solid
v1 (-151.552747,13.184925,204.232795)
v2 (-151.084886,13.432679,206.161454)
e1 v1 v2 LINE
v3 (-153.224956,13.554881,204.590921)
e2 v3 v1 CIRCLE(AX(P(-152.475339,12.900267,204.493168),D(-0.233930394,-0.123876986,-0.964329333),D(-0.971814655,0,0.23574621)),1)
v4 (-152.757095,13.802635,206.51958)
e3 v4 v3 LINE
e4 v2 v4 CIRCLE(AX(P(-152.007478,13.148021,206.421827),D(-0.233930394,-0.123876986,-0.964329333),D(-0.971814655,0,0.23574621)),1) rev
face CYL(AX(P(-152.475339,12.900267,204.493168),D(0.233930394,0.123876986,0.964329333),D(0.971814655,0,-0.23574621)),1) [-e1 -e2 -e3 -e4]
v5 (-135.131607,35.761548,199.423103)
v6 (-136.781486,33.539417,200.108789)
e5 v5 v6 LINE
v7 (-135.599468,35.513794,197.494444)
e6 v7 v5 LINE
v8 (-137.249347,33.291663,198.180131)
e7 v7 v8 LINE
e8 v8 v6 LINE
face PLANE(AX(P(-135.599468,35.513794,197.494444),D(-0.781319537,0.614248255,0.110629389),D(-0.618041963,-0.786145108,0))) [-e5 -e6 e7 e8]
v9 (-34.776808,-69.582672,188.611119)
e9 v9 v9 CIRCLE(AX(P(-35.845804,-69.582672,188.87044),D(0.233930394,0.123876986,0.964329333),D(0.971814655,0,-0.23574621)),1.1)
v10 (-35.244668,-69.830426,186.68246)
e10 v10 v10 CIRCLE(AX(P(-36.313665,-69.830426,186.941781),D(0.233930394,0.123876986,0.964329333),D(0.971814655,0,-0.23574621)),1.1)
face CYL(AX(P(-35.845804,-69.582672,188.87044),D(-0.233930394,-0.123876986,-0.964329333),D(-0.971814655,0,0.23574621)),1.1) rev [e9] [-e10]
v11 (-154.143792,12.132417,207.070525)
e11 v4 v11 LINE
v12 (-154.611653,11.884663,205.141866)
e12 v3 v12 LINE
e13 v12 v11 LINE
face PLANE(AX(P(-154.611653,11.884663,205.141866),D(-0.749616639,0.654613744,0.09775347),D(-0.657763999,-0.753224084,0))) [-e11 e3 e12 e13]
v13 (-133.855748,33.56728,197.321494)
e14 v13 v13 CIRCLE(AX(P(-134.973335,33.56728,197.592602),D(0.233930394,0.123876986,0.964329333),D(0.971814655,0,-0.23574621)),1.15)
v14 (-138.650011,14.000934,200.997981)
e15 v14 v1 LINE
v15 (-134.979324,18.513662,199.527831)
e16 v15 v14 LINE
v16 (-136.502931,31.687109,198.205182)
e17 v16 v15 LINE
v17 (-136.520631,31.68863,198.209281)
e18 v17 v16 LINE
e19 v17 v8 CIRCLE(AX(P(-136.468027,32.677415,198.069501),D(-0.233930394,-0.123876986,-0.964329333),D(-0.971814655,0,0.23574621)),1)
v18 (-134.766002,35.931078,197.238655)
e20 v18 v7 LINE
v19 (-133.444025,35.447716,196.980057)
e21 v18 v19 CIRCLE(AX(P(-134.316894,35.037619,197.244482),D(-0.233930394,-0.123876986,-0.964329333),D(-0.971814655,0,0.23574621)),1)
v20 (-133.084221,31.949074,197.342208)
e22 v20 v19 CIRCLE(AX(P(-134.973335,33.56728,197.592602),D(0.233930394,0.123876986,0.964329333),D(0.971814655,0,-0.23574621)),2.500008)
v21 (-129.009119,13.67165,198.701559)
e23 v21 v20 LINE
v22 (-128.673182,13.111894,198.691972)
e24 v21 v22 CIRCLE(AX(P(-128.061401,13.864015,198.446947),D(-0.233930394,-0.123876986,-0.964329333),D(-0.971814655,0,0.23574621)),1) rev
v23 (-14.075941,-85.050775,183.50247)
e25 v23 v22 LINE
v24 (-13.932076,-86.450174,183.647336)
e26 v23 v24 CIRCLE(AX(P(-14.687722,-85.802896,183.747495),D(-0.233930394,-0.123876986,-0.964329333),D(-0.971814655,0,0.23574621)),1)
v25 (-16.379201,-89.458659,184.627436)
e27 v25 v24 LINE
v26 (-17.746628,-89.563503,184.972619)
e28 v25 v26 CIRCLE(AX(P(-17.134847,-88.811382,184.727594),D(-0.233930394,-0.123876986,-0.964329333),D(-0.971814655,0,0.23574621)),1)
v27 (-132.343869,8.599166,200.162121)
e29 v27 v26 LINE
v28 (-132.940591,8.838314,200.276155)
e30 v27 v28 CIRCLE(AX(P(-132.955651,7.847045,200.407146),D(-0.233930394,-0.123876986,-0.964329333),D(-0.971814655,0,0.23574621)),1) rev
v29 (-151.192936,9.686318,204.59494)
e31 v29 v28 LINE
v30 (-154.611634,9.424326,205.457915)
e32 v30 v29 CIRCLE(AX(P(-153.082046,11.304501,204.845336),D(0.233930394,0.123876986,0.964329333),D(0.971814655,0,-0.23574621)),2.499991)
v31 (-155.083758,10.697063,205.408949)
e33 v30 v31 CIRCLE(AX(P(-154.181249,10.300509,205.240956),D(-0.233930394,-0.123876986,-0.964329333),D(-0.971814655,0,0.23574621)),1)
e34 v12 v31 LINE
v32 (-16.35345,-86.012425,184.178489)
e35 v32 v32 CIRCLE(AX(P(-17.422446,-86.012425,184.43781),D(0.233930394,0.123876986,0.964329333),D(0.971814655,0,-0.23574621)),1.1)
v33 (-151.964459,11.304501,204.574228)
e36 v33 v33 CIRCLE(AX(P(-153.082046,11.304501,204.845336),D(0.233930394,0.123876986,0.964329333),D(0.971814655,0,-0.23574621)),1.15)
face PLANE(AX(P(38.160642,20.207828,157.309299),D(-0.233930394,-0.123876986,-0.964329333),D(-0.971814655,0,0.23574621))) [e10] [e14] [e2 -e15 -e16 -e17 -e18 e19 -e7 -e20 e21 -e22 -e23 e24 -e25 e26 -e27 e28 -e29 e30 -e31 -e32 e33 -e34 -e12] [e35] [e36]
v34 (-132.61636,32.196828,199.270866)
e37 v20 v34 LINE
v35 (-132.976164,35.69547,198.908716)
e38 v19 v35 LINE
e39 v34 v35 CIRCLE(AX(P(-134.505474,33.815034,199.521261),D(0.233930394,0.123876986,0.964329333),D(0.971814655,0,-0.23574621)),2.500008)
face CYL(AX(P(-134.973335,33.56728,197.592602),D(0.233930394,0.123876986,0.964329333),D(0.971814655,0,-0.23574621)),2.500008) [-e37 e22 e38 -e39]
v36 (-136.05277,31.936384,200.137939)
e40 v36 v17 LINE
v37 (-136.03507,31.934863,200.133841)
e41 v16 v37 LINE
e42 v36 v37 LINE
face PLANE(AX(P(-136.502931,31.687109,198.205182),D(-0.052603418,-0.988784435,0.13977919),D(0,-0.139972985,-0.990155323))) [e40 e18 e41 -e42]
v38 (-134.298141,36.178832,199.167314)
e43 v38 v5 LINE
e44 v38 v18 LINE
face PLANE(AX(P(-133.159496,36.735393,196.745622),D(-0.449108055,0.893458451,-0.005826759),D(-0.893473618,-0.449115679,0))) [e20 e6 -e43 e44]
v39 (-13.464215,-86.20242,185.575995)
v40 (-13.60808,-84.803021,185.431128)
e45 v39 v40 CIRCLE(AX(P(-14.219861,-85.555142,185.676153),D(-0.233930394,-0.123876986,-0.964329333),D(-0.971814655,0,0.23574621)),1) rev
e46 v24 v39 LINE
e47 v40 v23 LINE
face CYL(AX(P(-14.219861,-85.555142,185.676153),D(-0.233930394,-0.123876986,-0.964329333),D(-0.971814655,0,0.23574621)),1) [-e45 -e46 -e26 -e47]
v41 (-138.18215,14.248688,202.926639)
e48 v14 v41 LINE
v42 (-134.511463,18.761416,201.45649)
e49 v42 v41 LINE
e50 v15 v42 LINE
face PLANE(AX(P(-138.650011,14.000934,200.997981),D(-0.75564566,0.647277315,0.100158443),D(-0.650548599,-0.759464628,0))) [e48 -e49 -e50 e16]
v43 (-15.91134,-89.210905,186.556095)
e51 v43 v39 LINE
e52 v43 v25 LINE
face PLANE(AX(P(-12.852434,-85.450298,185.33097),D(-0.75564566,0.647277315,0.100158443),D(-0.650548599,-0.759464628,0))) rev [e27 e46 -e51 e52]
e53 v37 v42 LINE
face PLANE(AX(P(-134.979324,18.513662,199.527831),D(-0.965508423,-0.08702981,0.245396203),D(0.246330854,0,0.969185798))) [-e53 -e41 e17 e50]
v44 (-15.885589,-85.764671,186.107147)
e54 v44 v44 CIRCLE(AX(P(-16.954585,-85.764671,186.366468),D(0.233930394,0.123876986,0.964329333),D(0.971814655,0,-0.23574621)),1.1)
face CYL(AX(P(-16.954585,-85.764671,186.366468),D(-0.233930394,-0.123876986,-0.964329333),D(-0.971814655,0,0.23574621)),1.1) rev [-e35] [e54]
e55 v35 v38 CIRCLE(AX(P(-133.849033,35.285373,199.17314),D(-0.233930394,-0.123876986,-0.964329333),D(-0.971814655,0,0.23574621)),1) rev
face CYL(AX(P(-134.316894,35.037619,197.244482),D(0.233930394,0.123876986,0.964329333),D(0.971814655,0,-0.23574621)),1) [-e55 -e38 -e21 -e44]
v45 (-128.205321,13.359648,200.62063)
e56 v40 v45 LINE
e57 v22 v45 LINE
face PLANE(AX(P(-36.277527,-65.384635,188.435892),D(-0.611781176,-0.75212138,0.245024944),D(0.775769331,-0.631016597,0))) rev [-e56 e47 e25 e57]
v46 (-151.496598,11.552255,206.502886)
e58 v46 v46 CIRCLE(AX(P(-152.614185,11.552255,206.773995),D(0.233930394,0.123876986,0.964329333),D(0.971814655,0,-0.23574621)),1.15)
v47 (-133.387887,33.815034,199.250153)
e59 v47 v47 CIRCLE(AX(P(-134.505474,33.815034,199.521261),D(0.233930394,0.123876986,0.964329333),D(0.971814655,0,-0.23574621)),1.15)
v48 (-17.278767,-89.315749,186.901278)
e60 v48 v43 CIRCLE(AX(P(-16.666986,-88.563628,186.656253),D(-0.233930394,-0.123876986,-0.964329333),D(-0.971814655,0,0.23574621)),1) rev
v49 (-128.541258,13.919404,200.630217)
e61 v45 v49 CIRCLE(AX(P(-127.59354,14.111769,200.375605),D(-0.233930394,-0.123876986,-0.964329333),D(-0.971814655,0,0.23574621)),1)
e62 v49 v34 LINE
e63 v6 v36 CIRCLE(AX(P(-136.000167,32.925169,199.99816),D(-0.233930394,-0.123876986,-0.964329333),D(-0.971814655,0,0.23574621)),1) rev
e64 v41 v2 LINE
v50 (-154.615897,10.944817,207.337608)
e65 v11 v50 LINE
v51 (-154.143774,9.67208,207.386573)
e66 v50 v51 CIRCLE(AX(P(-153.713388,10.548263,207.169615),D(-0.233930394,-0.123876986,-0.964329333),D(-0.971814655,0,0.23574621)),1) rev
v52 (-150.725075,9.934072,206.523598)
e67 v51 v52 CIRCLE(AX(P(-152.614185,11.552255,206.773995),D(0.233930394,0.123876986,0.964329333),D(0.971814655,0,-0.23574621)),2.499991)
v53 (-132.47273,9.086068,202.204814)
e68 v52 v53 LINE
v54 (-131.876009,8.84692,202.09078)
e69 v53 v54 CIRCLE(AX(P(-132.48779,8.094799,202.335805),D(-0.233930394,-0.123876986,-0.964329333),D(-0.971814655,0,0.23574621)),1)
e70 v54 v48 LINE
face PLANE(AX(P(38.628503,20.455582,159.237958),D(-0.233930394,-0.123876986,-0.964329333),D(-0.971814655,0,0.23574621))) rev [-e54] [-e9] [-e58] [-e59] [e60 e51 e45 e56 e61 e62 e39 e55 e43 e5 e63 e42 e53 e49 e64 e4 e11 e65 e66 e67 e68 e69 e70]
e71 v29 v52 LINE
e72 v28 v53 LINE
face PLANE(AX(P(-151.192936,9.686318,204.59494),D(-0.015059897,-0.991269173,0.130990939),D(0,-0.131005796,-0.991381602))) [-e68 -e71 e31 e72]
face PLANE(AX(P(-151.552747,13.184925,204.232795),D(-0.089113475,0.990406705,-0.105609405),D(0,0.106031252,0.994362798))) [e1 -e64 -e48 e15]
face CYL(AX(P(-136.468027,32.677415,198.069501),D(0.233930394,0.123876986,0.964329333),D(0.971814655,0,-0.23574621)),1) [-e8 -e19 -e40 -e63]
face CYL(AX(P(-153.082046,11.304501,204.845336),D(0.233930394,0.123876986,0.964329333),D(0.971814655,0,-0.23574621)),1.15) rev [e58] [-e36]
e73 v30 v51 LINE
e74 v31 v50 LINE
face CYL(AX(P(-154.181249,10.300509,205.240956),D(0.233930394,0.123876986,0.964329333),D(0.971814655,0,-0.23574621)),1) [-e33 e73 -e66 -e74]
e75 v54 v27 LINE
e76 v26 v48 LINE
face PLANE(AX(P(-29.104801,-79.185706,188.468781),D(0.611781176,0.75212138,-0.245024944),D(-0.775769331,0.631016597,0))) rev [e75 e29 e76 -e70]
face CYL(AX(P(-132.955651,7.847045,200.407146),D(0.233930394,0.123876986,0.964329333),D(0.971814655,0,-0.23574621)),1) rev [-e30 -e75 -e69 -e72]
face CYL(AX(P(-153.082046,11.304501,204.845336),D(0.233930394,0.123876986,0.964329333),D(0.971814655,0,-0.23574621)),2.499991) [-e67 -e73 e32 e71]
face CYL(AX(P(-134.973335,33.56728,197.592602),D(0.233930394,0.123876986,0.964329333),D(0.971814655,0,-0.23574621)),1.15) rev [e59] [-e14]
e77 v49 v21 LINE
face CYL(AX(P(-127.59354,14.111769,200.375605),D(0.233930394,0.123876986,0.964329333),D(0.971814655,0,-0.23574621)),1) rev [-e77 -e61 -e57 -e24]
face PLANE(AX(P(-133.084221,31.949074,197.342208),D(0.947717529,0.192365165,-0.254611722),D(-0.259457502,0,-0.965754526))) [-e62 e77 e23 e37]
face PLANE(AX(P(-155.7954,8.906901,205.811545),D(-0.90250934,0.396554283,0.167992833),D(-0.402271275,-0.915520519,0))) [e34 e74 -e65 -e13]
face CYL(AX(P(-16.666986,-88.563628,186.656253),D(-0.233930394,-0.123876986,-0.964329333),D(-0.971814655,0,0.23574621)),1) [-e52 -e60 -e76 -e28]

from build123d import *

# Parameters (mm, degrees)
SZKIC3_R                    = 1.10000034
DODANIE_WYCI_GNI_CIE2_DEPTH = 2
SZKIC7_R                    = 1.15000024
DODANIE_WYCI_GNI_CIE4_DEPTH = 2
ZAOKR_GLENIE1_R             = 1


with BuildPart() as part:
    # Szkic3 → Dodanie-wyciągnięcie2 (new body)
    with BuildSketch(Plane(origin=(38.160641903, 20.207828477, 157.30929901), x_dir=(0.972253346903095, -0.029805597670841302, -0.23202382589556209), z_dir=(0.23393039442477367, 0.12387698555880203, 0.964329333274237))):
        Polygon((-69.666310572, -102.553561212), (-79.264860968, -94.782442078), (-80.819178513, -93.5240451), (-77.043735552, -88.860781173), (-75.489418007, -90.119178151), (-65.890867611, -97.890297285), (-52.950125678, -108.367300905), (-56.725568639, -113.030564831), align=None)
        with Locations(Location((-57.169345947, -108.811046896, 0), (0, 0, 1.721249632))):
            Circle(SZKIC3_R, mode=Mode.SUBTRACT)
        with Locations(Location((-76.599691895, -93.079970126, 0), (0, 0, 1.721249632))):
            Circle(SZKIC3_R, mode=Mode.SUBTRACT)
    extrude(amount=DODANIE_WYCI_GNI_CIE2_DEPTH)

    # Szkic7 → Dodanie-wyciągnięcie4 (add)
    with BuildSketch(Plane(origin=(38.628502692, 20.455582448, 159.237957676), x_dir=(0.9722533469030947, -0.029805597670841396, -0.23202382589556286), z_dir=(0.23393039442477445, 0.12387698555880199, 0.9643293332742368))):
        with BuildLine():
            Line((-80.819178513, -93.5240451), (-175.638878356, -16.756704897))
            Line((-175.638878356, -16.756704897), (-194.757445315, -16.460528815))
            ThreePointArc((-194.757445315, -16.460528815), (-196.438982344, -17.373715152), (-198.273708049, -16.830338985))
            Line((-198.273708049, -16.830338985), (-199.491256389, -17.388602921))
            Line((-199.491256389, -17.388602921), (-198.273726955, -14.349785721))
            Line((-198.273726955, -14.349785721), (-195.616721108, -11.132918291))
            Line((-195.616721108, -11.132918291), (-195.127524487, -12.944294382))
            Line((-195.127524487, -12.944294382), (-181.856563591, -11.72278095))
            Line((-181.856563591, -11.72278095), (-178.08112063, -7.059517023))
            Line((-178.08112063, -7.059517023), (-179.648209308, 6.175086532))
            Line((-179.648209308, 6.175086532), (-181.521733094, 6.276601555))
            Line((-181.521733094, 6.276601555), (-178.718962553, 10.061139804))
            Line((-178.718962553, 10.061139804), (-176.20935813, 11.368191294))
            Line((-176.20935813, 11.368191294), (-176.502006841, 10.061139804))
            ThreePointArc((-176.502006841, 10.061139804), (-175.588684843, 8.379653584), (-176.131934764, 6.544869536))
            Line((-176.131934764, 6.544869536), (-171.863435395, -12.093440971))
            Line((-171.863435395, -12.093440971), (-77.043735552, -88.860781173))
            Line((-77.043735552, -88.860781173), (-80.819178513, -93.5240451))
        make_face()
        with Locations(Location((-178.074960694, 8.117983918, 0), (0, 0, 1.721249632))):
            Circle(SZKIC7_R, mode=Mode.SUBTRACT)
        with Locations(Location((-196.700467622, -14.887437029, 0), (0, 0, 1.721249632))):
            Circle(SZKIC7_R, mode=Mode.SUBTRACT)
    extrude(amount=-DODANIE_WYCI_GNI_CIE4_DEPTH)

    # Zaokrąglenie1
    # the kernel refuses this fillet: 1 mm, written as the material it adds along each edge
    with BuildSketch(Plane(origin=(-132.136984635, 9.070469004, 202.125371666), x_dir=(0.7556456600365923, -0.6472773151749931, -0.10015844311747091), z_dir=(-0.23393039442477445, -0.12387698555880199, -0.9643293332742368))) as zaokr_glenie1_piece_1:
        with BuildLine():
            CenterArc((ZAOKR_GLENIE1_R * 0.345368312497, ZAOKR_GLENIE1_R), ZAOKR_GLENIE1_R, 231.893419256, 38.106580745)
            Line((-ZAOKR_GLENIE1_R * 0.271757942514, ZAOKR_GLENIE1_R * 0.213135853291), (0, 0))
            Line((0, 0), (ZAOKR_GLENIE1_R * 0.345368312498, 0))
        make_face()
    extrude(amount=2)
    with BuildSketch(Plane(origin=(-128.466297581, 13.583197282, 200.655222001), x_dir=(0.755645659983129, -0.6472773152407205, -0.10015844309605833), z_dir=(-0.23393039442477445, -0.12387698555880199, -0.9643293332742368))) as zaokr_glenie1_piece_2:
        with BuildLine():
            CenterArc((ZAOKR_GLENIE1_R * 0.345368517806, -ZAOKR_GLENIE1_R), ZAOKR_GLENIE1_R, 89.999999995, 38.106601769)
            Line((-ZAOKR_GLENIE1_R * 0.271758025873, -ZAOKR_GLENIE1_R * 0.213136079689), (0, 0))
            Line((0, 0), (ZAOKR_GLENIE1_R * 0.345368517893, 0))
        make_face()
    extrude(amount=2)
    # the kernel refuses this fillet: 1 mm, written as the material it takes off along each edge
    with BuildSketch(Plane(origin=(-150.430265808, 15.842388646, 210.703360527), x_dir=(-0.6191538304813691, -0.7457448210428924, 0.24599430092575822), z_dir=(-0.23393039442477445, -0.12387698555880199, -0.9643293332742368))) as zaokr_glenie1_2_piece_1:
        with BuildLine():
            CenterArc((1.932614717, -1), ZAOKR_GLENIE1_R, 90, 122.052914314)
            Line((1.085056378, -1.530702235), (0, 0))
            Line((0, 0), (1.932614717, 0))
        make_face()
    extrude(amount=11.663073583, mode=Mode.SUBTRACT)
    with BuildSketch(Plane(origin=(-154.176575818, 9.764143782, 212.484809281), x_dir=(0.8837805609022797, 0.3863007559342876, -0.2640144809207439), z_dir=(-0.23393039442477445, -0.12387698555880199, -0.9643293332742368))) as zaokr_glenie1_2_piece_2:
        with BuildLine():
            CenterArc((2.115550514, -0.630589135), ZAOKR_GLENIE1_R, 140.906398732, 85.559709417)
            Line((1.426766982, -1.355556201), (0, 0))
            Line((0, 0), (1.339433679, 0))
        make_face()
    extrude(amount=11.840219302, mode=Mode.SUBTRACT)
    with BuildSketch(Plane(origin=(-136.76997961, 32.666813554, 205.035015593), x_dir=(0.9708292594479915, -0.08342561993848581, -0.22479037999332602), z_dir=(-0.23393039442477445, -0.12387698555880199, -0.9643293332742368))) as zaokr_glenie1_2_piece_3:
        with BuildLine():
            CenterArc((ZAOKR_GLENIE1_R * 1.85804027171, -ZAOKR_GLENIE1_R), ZAOKR_GLENIE1_R, 90, 123.421594356)
            Line((ZAOKR_GLENIE1_R * 1.02339993985, -ZAOKR_GLENIE1_R * 1.55079534897), (0, 0))
            Line((0, 0), (ZAOKR_GLENIE1_R * 1.85804027171, 0))
        make_face()
    extrude(amount=11.290201359, mode=Mode.SUBTRACT)
    with BuildSketch(Plane(origin=(-131.602089653, 37.560111501, 203.16570616), x_dir=(-0.8623099936693889, -0.4317250154405725, 0.26464123990930793), z_dir=(-0.23393039442477445, -0.12387698555880199, -0.9643293332742368))) as zaokr_glenie1_2_piece_4:
        with BuildLine():
            CenterArc((1.863025718, -1), ZAOKR_GLENIE1_R, 90, 91.379076601)
            Line((0.863315373, -1.024067103), (0, 0))
            Line((0, 0), (1.863025718, 0))
        make_face()
    extrude(amount=11.315128591, mode=Mode.SUBTRACT)
    with BuildSketch(Plane(origin=(-13.905120992, -86.007744656, 180.991487948), x_dir=(-0.6117811757755813, -0.7521213796372446, 0.24502494415715118), z_dir=(0.23393039442477367, 0.12387698555880203, 0.964329333274237)), Plane(origin=(-17.575808047, -90.520472934, 182.461637613), x_dir=(-0.7556456600354768, 0.6472773151763643, 0.10015844311702354), z_dir=(0.23393039442477367, 0.12387698555880203, 0.964329333274237))) as zaokr_glenie1_2_piece_5:
        with BuildLine():
            CenterArc((ZAOKR_GLENIE1_R, -ZAOKR_GLENIE1_R), ZAOKR_GLENIE1_R, 90, 90)
            Line((0, -ZAOKR_GLENIE1_R), (0, 0))
            Line((0, 0), (ZAOKR_GLENIE1_R, 0))
        make_face()
    extrude(amount=7, mode=Mode.SUBTRACT)


solid = part.part
